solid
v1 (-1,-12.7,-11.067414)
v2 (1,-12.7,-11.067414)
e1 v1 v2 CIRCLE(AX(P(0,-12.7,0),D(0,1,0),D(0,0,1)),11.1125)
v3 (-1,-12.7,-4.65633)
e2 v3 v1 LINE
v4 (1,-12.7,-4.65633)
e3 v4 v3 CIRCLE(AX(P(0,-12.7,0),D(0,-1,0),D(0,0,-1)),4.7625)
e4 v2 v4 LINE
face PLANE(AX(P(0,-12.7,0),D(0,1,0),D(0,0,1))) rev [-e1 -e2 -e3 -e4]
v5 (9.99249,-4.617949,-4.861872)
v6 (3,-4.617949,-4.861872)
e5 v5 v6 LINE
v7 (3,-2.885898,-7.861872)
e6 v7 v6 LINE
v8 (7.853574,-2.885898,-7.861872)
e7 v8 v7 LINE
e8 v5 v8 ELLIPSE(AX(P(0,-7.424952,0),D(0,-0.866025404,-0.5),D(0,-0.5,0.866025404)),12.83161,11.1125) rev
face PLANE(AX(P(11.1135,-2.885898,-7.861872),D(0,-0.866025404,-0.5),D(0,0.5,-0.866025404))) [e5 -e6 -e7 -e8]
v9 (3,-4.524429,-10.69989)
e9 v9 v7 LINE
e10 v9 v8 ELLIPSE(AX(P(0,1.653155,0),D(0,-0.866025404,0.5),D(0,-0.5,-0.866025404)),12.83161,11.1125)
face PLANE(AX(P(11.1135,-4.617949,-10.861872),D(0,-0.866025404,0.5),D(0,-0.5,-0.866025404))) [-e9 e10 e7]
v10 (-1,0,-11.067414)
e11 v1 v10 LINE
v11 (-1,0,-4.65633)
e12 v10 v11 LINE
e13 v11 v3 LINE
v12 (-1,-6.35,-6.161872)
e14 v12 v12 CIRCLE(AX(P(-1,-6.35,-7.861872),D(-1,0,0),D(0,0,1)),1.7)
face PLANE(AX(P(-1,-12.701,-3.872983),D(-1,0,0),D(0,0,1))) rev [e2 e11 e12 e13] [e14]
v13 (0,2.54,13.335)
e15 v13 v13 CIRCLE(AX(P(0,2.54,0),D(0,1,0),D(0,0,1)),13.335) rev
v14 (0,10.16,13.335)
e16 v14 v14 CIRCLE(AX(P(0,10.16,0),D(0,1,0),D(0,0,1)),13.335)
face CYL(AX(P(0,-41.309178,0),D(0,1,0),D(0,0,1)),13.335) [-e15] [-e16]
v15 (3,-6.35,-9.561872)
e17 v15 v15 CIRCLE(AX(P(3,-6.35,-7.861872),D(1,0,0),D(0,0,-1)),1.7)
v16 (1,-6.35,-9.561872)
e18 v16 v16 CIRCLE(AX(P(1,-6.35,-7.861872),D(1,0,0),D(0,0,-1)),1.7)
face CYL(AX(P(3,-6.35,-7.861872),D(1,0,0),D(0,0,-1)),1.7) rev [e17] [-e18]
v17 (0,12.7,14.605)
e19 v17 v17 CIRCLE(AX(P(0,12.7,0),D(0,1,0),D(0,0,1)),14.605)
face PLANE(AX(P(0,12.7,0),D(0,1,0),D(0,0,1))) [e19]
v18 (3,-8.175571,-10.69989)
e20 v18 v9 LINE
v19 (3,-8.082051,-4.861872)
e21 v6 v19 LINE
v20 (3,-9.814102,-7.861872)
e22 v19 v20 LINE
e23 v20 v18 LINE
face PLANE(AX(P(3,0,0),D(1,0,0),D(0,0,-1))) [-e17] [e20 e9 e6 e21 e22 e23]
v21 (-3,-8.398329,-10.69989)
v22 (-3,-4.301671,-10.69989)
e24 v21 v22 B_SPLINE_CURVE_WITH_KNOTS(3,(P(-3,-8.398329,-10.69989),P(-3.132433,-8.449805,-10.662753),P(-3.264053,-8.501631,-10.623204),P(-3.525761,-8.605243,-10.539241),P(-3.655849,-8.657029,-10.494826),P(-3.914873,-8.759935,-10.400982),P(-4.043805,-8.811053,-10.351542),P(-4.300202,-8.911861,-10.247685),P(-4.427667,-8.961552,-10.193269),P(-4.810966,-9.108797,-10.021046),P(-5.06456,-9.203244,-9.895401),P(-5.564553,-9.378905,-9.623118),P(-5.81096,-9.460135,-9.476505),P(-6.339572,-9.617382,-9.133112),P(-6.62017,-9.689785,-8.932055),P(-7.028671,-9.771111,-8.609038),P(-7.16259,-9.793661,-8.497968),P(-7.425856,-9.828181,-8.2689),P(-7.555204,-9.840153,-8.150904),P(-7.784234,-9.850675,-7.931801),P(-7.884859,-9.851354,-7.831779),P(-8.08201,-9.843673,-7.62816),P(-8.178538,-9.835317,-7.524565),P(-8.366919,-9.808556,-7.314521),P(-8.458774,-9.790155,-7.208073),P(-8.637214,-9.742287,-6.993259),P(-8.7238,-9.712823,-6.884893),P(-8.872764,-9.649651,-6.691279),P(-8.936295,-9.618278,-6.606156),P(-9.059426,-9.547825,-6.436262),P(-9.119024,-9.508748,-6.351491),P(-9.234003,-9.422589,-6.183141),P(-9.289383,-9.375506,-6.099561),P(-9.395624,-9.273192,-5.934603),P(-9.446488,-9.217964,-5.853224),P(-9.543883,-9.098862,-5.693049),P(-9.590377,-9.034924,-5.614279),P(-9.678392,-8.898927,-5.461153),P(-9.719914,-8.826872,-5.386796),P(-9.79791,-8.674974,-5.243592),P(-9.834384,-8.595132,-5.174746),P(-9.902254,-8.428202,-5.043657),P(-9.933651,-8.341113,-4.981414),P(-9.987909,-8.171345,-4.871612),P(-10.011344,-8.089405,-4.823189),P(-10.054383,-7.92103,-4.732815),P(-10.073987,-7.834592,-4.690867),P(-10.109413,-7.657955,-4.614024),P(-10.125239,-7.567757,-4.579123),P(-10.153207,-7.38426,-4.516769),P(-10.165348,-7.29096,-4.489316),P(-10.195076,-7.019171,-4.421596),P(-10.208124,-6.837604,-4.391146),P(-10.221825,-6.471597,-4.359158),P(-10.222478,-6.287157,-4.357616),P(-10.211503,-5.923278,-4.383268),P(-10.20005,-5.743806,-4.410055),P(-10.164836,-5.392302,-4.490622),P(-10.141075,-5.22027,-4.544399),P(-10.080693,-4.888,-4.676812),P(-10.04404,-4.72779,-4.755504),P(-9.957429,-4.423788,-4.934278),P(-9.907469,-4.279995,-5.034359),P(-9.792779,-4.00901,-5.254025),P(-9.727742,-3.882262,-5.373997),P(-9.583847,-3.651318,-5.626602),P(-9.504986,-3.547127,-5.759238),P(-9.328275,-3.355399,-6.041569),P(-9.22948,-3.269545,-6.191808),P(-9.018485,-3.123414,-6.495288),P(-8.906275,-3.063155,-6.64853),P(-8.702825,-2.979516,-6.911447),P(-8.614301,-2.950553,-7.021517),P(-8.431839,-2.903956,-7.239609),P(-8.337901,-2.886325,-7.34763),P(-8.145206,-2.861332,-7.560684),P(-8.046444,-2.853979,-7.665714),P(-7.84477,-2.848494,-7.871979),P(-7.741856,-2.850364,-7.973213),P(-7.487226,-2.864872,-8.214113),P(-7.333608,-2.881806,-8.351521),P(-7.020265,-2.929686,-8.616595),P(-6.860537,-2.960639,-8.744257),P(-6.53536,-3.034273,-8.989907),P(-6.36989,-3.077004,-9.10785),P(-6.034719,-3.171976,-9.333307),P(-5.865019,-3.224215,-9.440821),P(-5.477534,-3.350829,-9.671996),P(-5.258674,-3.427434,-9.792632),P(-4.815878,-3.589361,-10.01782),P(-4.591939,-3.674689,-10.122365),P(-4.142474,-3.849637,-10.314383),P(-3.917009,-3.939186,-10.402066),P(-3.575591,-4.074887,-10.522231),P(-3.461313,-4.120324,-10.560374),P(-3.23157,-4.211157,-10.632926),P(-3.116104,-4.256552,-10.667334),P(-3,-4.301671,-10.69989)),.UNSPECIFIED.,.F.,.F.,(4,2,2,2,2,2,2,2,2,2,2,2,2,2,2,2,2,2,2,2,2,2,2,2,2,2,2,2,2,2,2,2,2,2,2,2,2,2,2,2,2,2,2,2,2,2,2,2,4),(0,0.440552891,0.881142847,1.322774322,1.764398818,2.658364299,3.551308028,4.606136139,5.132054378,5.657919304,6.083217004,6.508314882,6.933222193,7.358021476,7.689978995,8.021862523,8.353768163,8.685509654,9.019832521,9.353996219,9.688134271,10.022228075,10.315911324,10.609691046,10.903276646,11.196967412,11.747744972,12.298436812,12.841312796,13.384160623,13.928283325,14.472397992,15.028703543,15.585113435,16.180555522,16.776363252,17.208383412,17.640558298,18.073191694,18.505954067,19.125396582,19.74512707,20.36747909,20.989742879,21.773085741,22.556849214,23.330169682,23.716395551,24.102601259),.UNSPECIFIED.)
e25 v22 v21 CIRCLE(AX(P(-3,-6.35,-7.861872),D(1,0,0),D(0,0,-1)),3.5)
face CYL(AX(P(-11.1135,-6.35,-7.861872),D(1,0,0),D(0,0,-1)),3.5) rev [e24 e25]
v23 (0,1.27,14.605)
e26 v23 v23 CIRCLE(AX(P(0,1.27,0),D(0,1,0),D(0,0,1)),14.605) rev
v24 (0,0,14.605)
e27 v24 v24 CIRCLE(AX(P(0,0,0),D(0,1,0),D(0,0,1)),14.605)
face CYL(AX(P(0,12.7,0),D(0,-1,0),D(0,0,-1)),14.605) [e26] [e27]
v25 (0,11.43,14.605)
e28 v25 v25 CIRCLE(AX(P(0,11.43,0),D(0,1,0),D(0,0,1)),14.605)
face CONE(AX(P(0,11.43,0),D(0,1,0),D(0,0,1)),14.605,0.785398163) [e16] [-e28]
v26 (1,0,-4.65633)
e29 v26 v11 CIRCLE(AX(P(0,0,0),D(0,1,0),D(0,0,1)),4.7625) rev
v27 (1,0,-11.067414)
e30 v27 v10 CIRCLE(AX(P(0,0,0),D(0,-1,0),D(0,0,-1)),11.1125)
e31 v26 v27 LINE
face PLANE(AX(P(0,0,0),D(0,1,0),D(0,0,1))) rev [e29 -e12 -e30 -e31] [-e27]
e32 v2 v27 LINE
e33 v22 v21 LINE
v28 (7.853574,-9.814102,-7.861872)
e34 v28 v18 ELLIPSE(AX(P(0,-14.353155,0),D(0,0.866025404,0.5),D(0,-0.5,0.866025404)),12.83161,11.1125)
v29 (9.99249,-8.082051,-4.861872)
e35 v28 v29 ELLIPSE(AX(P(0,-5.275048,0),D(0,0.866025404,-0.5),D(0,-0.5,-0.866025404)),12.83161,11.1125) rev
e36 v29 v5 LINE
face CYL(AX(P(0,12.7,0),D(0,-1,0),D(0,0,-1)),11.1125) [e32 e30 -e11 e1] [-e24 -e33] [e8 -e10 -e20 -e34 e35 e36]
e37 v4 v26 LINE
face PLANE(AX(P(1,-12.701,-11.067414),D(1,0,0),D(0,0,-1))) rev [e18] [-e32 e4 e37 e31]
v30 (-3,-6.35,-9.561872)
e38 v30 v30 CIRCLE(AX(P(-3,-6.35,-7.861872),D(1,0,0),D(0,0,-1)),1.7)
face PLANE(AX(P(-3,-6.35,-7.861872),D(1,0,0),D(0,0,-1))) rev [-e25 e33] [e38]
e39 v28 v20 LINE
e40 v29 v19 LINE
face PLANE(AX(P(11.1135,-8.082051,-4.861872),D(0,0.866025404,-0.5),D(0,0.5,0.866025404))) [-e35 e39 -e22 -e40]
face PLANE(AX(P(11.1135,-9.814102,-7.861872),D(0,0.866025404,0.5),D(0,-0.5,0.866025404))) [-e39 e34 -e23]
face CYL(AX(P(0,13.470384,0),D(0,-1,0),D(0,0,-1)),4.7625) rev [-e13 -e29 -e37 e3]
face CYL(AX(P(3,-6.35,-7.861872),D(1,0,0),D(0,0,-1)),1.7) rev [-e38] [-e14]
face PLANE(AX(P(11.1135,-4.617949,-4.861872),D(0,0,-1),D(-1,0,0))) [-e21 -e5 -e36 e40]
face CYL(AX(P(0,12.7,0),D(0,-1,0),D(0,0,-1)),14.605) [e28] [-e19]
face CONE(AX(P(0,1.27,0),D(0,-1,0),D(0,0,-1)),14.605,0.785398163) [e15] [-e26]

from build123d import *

# Parameters (mm, degrees)
SKETCH1_R                           = 11.1125
BOSS_EXTRUDE1_DEPTH                 = 12.7
CUT_EXTRUDE1_START                  = -12.7
SKETCH2_R                           = 4
CUT_EXTRUDE1_DEPTH                  = 12.7
CUT_EXTRUDE2_START                  = -12.7
SKETCH3_R                           = 4.7625
CUT_EXTRUDE2_DEPTH                  = 12.7
CUT_EXTRUDE3_REACH                  = 31.869
CUT_EXTRUDE4_DEPTH                  = 4
CUT_EXTRUDE4_DIRECTION_2_REACH      = 26.756
CUT_EXTRUDE4_DIRECTION_2_END_RADIUS = 11.1125
M3_CLEARANCE_HOLE1_D                = 3.4
CUT_EXTRUDE5_REACH                  = 23.999
SKETCH9_R                           = 3.5
SKETCH10_R                          = 14.605
BOSS_EXTRUDE2_DEPTH                 = 12.7
CUT_EXTRUDE6_START                  = -2.54
SKETCH11_R                          = 14.605
SKETCH11_R_2                        = 13.335
CUT_EXTRUDE6_DEPTH                  = 7.62
CHAMFER1_SIZE                       = 1.27


# Read off the part's stored shape, not the designer's step: Split1
with BuildPart() as part:
    # Sketch1 → Boss-Extrude1 (new, symmetric)
    with BuildSketch(Plane(origin=(0, 0, 0), x_dir=(1, 0, 0), z_dir=(0, 1, 0))):
        with Locations(Location((0, 0, 0), (0, 0, 270))):
            Circle(SKETCH1_R)
    extrude(amount=BOSS_EXTRUDE1_DEPTH, both=True)

    # Sketch2 → Cut-Extrude1 (cut)
    with BuildSketch(Plane(origin=(0, 12.7, 0), x_dir=(1, 0, 0), z_dir=(0, 1, 0)).offset(CUT_EXTRUDE1_START)):
        with Locations(Location((0, 0, 0), (0, 0, 270))):
            Circle(SKETCH2_R)
    extrude(amount=CUT_EXTRUDE1_DEPTH, mode=Mode.SUBTRACT)

    # Sketch3 → Cut-Extrude2 (cut)
    with BuildSketch(Plane.XZ.offset(12.7).offset(CUT_EXTRUDE2_START)):
        with Locations(Location((0, 0, 0), (0, 0, 270))):
            Circle(SKETCH3_R)
    extrude(amount=CUT_EXTRUDE2_DEPTH, mode=Mode.SUBTRACT)

    # Sketch4 → Cut-Extrude3 (cut, up to next)
    with BuildSketch(Plane(origin=(0, 12.7, 0), x_dir=(1, 0, 0), z_dir=(0, 1, 0)), mode=Mode.PRIVATE) as cut_extrude3_sk1:
        with BuildLine():
            Line((-1, 3.872983346), (-1, 11.067414163))
            ThreePointArc((-1, 11.067414163), (0, 11.1125), (1, 11.067414163))
            Line((1, 11.067414163), (1, 3.872983346))
            ThreePointArc((1, 3.872983346), (0, 4), (-1, 3.872983346))
        make_face()
    cut_extrude3_tool1 = extrude(cut_extrude3_sk1.sketch, amount=-CUT_EXTRUDE3_REACH, mode=Mode.PRIVATE) & part.part
    add(cut_extrude3_tool1.solids().sort_by_distance((0, 12.7, -7.527621))[0], mode=Mode.SUBTRACT)

    # Sketch5 → Cut-Extrude4 (cut)
    with BuildSketch(Plane(origin=(7, 0, 0), x_dir=(0, 0, -1), z_dir=(1, 0, 0))):
        Polygon((7.86187193, 2.885898385), (10.86187193, 4.617949192), (10.86187193, 8.082050808), (7.86187193, 9.814101615), (4.86187193, 8.082050808), (4.86187193, 4.617949192), align=None)
        Polygon((7.86187193, -9.814101615), (10.86187193, -8.082050808), (10.86187193, -4.617949192), (7.86187193, -2.885898385), (4.86187193, -4.617949192), (4.86187193, -8.082050808), align=None)
    extrude(amount=-CUT_EXTRUDE4_DEPTH, mode=Mode.SUBTRACT)

    # Cut-Extrude4 direction 2: up to this cylinder (the profile starts inside it)
    cut_extrude4_direction_2_end = Plane(origin=(0, 0, 0), z_dir=(0, -1, 0)) * Cylinder(CUT_EXTRUDE4_DIRECTION_2_END_RADIUS, 89.437, mode=Mode.PRIVATE)
    # Sketch5 → Cut-Extrude4 direction 2 (cut, up to the surface)
    with BuildSketch(Plane(origin=(7, 0, 0), x_dir=(0, 0, -1), z_dir=(1, 0, 0)), mode=Mode.PRIVATE) as cut_extrude4_direction_2_sk1:
        Polygon((7.86187193, 2.885898385), (10.86187193, 4.617949192), (10.86187193, 8.082050808), (7.86187193, 9.814101615), (4.86187193, 8.082050808), (4.86187193, 4.617949192), align=None)
    cut_extrude4_direction_2_tool1 = extrude(cut_extrude4_direction_2_sk1.sketch, amount=CUT_EXTRUDE4_DIRECTION_2_REACH, mode=Mode.PRIVATE) & cut_extrude4_direction_2_end
    add(cut_extrude4_direction_2_tool1.solids().sort_by_distance((7, 6.35, -7.861872))[0], mode=Mode.SUBTRACT)
    # Sketch5 → Cut-Extrude4 direction 2 (cut, up to the surface)
    with BuildSketch(Plane(origin=(7, 0, 0), x_dir=(0, 0, -1), z_dir=(1, 0, 0)), mode=Mode.PRIVATE) as cut_extrude4_direction_2_sk2:
        Polygon((7.86187193, -9.814101615), (10.86187193, -8.082050808), (10.86187193, -4.617949192), (7.86187193, -2.885898385), (4.86187193, -4.617949192), (4.86187193, -8.082050808), align=None)
    cut_extrude4_direction_2_tool2 = extrude(cut_extrude4_direction_2_sk2.sketch, amount=CUT_EXTRUDE4_DIRECTION_2_REACH, mode=Mode.PRIVATE) & cut_extrude4_direction_2_end
    add(cut_extrude4_direction_2_tool2.solids().sort_by_distance((7, -6.35, -7.861872))[0], mode=Mode.SUBTRACT)

    # M3 Clearance Hole1 (through all)
    with Locations(Plane(origin=(3, 0, 0), x_dir=(0, 0, -1), z_dir=(1, 0, 0))):
        with Locations((7.86187193, 6.35), (7.86187193, -6.35)):
            Hole(M3_CLEARANCE_HOLE1_D / 2)

    # Sketch9 → Cut-Extrude5 (cut, up to next)
    with BuildSketch(Plane(origin=(-3, 0, 0), x_dir=(0, 0, -1), z_dir=(1, 0, 0)), mode=Mode.PRIVATE) as cut_extrude5_sk1:
        with Locations((7.86187193, 6.35)):
            Circle(SKETCH9_R)
    cut_extrude5_tool1 = extrude(cut_extrude5_sk1.sketch, amount=-CUT_EXTRUDE5_REACH, mode=Mode.PRIVATE) & part.part
    # Sketch9 → Cut-Extrude5 (cut, up to next)
    with BuildSketch(Plane(origin=(-3, 0, 0), x_dir=(0, 0, -1), z_dir=(1, 0, 0)), mode=Mode.PRIVATE) as cut_extrude5_sk2:
        with Locations((7.86187193, -6.35)):
            Circle(SKETCH9_R)
    cut_extrude5_tool2 = extrude(cut_extrude5_sk2.sketch, amount=-CUT_EXTRUDE5_REACH, mode=Mode.PRIVATE) & part.part
    add(cut_extrude5_tool1.solids().sort_by_distance((-3, 6.35, -7.861872))[0], mode=Mode.SUBTRACT)
    add(cut_extrude5_tool2.solids().sort_by_distance((-3, -6.35, -7.861872))[0], mode=Mode.SUBTRACT)


with BuildPart() as body_2:
    # Split1: the piece on the far side of the plane
    add(part.part)
    split(bisect_by=Plane(origin=(0, 0, 0), x_dir=(1, 0, 0), z_dir=(0, 1, 0)), keep=Keep.BOTTOM)

    # Sketch10 → Boss-Extrude2 (add)
    with BuildSketch(Plane(origin=(0, 0, 0), x_dir=(1, 0, 0), z_dir=(0, 1, 0))):
        with Locations(Location((0, 0, 0), (0, 0, 270))):
            Circle(SKETCH10_R)
    extrude(amount=BOSS_EXTRUDE2_DEPTH)

    # Sketch11 → Cut-Extrude6 (cut)
    with BuildSketch(Plane(origin=(0, 12.7, 0), x_dir=(1, 0, 0), z_dir=(0, 1, 0)).offset(CUT_EXTRUDE6_START)):
        with Locations(Location((0, 0, 0), (0, 0, 270))):
            Circle(SKETCH11_R)
        with Locations(Location((0, 0, 0), (0, 0, 270))):
            Circle(SKETCH11_R_2, mode=Mode.SUBTRACT)
    extrude(amount=-CUT_EXTRUDE6_DEPTH, mode=Mode.SUBTRACT)

    # Chamfer1
    chamfer1_edges = [body_2.edges().sort_by_distance(p)[0] for p in [
        (0, 10.16, -14.605),
        (0, 2.54, -14.605),
    ]]
    chamfer(chamfer1_edges, length=CHAMFER1_SIZE - 0.0001)  # a hair under: the kernel refuses the full size


with BuildPart() as part_1:
    add(part.part)

    # Split1
    split(bisect_by=Plane(origin=(0, 0, 0), x_dir=(1, 0, 0), z_dir=(0, 1, 0)), keep=Keep.TOP)


solid = body_2.part
